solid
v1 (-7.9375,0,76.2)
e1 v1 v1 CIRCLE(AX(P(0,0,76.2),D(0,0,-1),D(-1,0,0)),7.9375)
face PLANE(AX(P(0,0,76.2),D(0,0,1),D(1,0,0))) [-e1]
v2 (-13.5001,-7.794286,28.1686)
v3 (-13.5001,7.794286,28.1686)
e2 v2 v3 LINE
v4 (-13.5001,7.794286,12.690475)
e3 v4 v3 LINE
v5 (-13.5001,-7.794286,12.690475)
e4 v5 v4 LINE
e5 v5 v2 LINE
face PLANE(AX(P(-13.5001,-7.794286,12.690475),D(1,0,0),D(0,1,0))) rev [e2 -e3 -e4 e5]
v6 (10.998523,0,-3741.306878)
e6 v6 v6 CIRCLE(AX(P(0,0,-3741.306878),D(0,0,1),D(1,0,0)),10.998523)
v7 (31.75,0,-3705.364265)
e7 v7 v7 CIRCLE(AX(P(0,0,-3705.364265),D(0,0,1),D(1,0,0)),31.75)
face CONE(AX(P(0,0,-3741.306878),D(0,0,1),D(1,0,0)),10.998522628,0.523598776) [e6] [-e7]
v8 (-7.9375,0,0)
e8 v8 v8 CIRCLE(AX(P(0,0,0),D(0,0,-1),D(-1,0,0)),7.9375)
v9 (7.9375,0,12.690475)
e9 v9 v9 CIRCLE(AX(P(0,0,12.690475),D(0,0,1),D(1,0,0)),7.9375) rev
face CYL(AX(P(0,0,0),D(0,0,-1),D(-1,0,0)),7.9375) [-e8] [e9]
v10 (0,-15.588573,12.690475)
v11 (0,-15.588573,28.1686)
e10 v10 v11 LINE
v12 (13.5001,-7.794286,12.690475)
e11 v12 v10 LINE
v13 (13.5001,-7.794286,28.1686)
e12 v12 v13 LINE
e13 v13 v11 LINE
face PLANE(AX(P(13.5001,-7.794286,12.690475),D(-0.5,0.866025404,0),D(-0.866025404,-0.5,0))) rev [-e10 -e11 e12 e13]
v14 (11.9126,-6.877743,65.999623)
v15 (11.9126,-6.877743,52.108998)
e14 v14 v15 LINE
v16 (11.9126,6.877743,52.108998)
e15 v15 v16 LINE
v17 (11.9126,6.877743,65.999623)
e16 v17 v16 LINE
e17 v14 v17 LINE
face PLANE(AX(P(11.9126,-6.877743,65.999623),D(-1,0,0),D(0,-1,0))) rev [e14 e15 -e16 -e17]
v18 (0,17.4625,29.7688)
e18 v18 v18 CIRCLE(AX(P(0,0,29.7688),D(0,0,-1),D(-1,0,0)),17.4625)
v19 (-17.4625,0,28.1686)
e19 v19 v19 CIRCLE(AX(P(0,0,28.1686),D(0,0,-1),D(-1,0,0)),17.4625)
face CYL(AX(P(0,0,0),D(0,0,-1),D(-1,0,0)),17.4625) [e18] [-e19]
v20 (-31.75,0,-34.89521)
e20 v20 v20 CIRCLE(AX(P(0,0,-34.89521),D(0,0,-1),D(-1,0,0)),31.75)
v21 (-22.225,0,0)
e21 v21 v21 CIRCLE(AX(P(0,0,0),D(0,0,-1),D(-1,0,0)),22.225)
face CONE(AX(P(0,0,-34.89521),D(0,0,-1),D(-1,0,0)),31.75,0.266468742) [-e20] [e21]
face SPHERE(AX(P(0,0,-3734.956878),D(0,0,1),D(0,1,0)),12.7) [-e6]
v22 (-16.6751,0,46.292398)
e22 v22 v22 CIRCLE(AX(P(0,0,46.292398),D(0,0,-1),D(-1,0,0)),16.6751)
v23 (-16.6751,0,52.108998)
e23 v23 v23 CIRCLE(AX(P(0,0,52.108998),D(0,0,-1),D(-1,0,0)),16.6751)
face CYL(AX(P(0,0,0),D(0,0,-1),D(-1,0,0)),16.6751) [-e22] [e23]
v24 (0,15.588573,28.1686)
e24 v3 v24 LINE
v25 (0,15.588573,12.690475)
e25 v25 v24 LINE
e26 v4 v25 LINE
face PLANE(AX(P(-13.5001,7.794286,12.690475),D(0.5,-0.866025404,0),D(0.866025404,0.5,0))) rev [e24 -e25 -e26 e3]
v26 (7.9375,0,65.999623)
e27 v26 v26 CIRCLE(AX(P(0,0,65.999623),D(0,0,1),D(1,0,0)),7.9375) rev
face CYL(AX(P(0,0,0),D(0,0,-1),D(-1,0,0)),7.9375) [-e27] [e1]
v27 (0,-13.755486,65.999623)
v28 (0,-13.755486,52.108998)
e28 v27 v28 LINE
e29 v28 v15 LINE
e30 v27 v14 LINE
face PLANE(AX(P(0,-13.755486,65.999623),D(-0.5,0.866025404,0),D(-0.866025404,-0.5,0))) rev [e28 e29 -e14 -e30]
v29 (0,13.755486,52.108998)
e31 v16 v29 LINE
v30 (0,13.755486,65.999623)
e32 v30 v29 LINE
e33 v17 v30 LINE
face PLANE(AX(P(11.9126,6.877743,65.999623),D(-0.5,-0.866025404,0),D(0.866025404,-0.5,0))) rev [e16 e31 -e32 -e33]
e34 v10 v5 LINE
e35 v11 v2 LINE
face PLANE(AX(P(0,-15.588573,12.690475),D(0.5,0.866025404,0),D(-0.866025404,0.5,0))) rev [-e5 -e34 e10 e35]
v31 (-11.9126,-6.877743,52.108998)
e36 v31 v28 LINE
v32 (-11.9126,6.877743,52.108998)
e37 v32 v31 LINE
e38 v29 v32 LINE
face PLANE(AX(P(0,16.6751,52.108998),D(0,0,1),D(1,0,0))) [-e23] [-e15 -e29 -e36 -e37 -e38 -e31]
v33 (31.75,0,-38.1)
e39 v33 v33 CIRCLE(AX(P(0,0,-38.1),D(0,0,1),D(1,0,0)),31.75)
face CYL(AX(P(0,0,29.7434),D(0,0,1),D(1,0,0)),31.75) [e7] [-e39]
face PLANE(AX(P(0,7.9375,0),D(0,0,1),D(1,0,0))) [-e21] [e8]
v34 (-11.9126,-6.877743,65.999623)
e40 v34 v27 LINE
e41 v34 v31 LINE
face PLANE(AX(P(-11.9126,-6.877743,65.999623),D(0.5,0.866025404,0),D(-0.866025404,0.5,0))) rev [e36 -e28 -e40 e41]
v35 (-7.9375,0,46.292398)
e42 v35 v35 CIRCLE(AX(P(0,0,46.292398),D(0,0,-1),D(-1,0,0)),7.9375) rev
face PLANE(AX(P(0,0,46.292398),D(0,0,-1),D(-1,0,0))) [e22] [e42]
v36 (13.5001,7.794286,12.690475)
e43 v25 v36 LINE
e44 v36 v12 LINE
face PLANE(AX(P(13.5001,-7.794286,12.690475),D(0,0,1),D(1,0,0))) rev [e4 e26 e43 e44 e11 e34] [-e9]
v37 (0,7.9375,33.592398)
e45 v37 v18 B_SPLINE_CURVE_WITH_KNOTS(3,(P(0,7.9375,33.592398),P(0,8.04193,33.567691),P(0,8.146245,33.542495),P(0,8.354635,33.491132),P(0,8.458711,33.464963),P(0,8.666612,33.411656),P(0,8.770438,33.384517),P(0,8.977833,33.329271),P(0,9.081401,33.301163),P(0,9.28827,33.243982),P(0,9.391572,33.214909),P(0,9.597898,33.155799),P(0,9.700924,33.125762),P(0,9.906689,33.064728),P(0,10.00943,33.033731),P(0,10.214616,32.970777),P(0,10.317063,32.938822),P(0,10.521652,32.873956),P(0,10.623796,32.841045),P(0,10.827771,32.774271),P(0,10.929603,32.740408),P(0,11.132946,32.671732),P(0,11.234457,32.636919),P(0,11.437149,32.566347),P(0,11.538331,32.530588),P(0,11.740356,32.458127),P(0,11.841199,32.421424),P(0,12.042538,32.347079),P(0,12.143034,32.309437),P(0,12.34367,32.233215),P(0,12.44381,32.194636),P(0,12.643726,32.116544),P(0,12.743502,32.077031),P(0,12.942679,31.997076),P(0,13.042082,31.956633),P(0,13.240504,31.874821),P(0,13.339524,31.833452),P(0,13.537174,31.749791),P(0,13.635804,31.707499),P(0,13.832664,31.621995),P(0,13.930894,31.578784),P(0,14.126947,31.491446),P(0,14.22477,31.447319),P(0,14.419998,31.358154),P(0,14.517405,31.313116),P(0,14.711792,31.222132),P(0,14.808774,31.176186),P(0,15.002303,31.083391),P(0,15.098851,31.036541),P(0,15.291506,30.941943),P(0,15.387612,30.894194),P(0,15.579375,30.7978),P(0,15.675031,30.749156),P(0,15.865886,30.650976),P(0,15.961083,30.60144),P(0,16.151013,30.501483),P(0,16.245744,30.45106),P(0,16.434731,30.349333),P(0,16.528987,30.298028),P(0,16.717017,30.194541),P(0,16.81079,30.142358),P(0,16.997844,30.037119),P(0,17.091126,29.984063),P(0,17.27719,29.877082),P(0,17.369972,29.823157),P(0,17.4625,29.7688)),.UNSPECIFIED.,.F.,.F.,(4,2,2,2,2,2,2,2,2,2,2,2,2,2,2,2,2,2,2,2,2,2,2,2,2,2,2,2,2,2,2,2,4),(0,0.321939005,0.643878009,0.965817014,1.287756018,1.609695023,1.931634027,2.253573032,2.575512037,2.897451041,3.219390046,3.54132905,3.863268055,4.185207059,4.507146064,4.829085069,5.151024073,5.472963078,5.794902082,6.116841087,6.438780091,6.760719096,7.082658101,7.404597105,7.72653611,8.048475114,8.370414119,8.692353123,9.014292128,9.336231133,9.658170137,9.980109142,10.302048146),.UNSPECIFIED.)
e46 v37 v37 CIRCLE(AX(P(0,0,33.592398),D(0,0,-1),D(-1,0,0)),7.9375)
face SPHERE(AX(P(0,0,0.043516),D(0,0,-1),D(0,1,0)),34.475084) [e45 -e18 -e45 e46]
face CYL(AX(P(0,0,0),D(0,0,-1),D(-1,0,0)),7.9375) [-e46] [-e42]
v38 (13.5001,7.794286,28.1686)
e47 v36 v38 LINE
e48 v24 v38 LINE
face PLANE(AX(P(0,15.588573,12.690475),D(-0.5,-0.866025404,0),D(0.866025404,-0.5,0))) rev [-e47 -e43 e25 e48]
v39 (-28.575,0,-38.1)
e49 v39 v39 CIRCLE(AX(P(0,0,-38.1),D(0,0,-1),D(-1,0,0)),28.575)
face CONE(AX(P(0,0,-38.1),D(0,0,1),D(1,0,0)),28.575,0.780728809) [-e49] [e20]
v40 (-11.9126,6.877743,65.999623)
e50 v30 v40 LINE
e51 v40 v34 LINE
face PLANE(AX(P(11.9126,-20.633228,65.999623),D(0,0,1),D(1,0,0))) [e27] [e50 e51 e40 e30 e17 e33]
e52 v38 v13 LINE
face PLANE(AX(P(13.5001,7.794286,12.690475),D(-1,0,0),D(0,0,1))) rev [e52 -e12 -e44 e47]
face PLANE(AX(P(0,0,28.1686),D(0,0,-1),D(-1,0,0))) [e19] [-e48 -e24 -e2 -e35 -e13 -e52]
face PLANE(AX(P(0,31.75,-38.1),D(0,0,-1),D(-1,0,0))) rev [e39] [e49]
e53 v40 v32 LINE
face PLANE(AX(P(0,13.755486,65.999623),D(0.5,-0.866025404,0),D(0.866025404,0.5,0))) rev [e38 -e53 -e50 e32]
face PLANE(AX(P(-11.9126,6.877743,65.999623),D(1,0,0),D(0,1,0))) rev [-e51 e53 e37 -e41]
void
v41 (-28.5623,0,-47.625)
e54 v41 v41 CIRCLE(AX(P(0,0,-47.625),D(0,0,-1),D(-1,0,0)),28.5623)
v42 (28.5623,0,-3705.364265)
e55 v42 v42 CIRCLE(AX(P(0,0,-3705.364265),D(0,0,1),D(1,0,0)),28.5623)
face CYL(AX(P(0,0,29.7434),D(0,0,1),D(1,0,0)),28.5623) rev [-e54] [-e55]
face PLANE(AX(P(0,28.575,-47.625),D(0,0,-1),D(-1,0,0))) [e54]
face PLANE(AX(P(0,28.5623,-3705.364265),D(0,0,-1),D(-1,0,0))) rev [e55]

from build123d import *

# Parameters (mm, degrees)
BOSS_REVOLVE3_START         = 12.690475
BOSS_REVOLVE3_OUTLINE_R     = 7.9375
BOSS_REVOLVE3_DEPTH         = 15.478125
BOSS_REVOLVE3_START_2       = 46.292398399
BOSS_REVOLVE3_2_OUTLINE_R   = 16.6751
BOSS_REVOLVE3_2_OUTLINE_R_2 = 7.9375
BOSS_REVOLVE3_2_DEPTH       = 5.8166
BOSS_EXTRUDE2_DEPTH         = 13.890625


# Read off the part's stored shape, not the designer's step: Boss-Revolve3
with BuildPart() as part:
    # Sketch1 → Base-Revolve (revolve)
    with BuildSketch(Plane(origin=(0, 0, 0), x_dir=(0, 0, -1), z_dir=(1, 0, 0)), mode=Mode.PRIVATE) as base_revolve_sk:
        Polygon((-76.2, 0), (-76.2, 7.9375), (0, 7.9375), (0, 22.225), (34.895210283, 31.75), (38.1, 28.575), (47.625, 28.575), (47.625, 0), align=None)
    revolve(base_revolve_sk.sketch.rotate(Axis((0, 0, 0), (0, 0, 1)), 90), axis=Axis((0, 0, 0), (0, 0, 1)))

    # Sketch3 → Boss-Revolve2 (revolve)
    with BuildSketch(Plane(origin=(0, 0, 0), x_dir=(0, 0, -1), z_dir=(1, 0, 0)), mode=Mode.PRIVATE) as boss_revolve2_sk:
        with BuildLine():
            Line((-28.1686, 0), (-28.1686, 17.4625))
            Line((-28.1686, 17.4625), (-29.7688, 17.4625))
            ThreePointArc((-29.7688, 17.4625), (-33.309963658, 9.048473715), (-34.5186, 0))
            Line((-34.5186, 0), (-28.1686, 0))
        make_face()
    revolve(boss_revolve2_sk.sketch.rotate(Axis((0, 0, 0), (0, 0, 1)), 90), axis=Axis((0, 0, 0), (0, 0, 1)))

    # Sketch2 → Boss-Revolve1 (revolve)
    with BuildSketch(Plane(origin=(0, 0, 0), x_dir=(0, 0, -1), z_dir=(1, 0, 0)), mode=Mode.PRIVATE) as boss_revolve1_sk:
        with BuildLine():
            Line((38.1, 31.75), (38.1, 28.5623))
            Line((38.1, 28.5623), (3705.364265314, 28.5623))
            Line((3705.364265314, 28.5623), (3705.364265314, 0))
            Line((3705.364265314, 0), (3747.656878454, 0))
            ThreePointArc((3747.656878454, 0), (3745.955401082, 6.35), (3741.306878454, 10.998522628))
            Line((3741.306878454, 10.998522628), (3705.364265314, 31.75))
            Line((3705.364265314, 31.75), (38.1, 31.75))
        make_face()
    revolve(boss_revolve1_sk.sketch.rotate(Axis((0, 0, 29.7434), (0, 0, -1)), 90), axis=Axis((0, 0, 29.7434), (0, 0, -1)))

    # Boss-Revolve3 outline → Boss-Revolve3 (add)
    with BuildSketch(Plane.XY.offset(BOSS_REVOLVE3_START)):
        Polygon((0, -15.588572738), (13.5001, -7.794286369), (13.5001, 7.794286369), (0, 15.588572738), (-13.5001, 7.794286369), (-13.5001, -7.794286369), align=None)
        Circle(BOSS_REVOLVE3_OUTLINE_R, mode=Mode.SUBTRACT)
    extrude(amount=BOSS_REVOLVE3_DEPTH)

    # Boss-Revolve3 2 outline → Boss-Revolve3 2 (add)
    with BuildSketch(Plane.XY.offset(BOSS_REVOLVE3_START_2)):
        Circle(BOSS_REVOLVE3_2_OUTLINE_R)
        Circle(BOSS_REVOLVE3_2_OUTLINE_R_2, mode=Mode.SUBTRACT)
    extrude(amount=BOSS_REVOLVE3_2_DEPTH)

    # Sketch6 → Boss-Extrude2 (add)
    with BuildSketch(Plane.XY.offset(52.108998399)):
        Polygon((0, -13.755485633), (11.9126, -6.877742817), (11.9126, 6.877742817), (0, 13.755485633), (-11.9126, 6.877742817), (-11.9126, -6.877742817), align=None)
    extrude(amount=BOSS_EXTRUDE2_DEPTH)


solid = part.part
